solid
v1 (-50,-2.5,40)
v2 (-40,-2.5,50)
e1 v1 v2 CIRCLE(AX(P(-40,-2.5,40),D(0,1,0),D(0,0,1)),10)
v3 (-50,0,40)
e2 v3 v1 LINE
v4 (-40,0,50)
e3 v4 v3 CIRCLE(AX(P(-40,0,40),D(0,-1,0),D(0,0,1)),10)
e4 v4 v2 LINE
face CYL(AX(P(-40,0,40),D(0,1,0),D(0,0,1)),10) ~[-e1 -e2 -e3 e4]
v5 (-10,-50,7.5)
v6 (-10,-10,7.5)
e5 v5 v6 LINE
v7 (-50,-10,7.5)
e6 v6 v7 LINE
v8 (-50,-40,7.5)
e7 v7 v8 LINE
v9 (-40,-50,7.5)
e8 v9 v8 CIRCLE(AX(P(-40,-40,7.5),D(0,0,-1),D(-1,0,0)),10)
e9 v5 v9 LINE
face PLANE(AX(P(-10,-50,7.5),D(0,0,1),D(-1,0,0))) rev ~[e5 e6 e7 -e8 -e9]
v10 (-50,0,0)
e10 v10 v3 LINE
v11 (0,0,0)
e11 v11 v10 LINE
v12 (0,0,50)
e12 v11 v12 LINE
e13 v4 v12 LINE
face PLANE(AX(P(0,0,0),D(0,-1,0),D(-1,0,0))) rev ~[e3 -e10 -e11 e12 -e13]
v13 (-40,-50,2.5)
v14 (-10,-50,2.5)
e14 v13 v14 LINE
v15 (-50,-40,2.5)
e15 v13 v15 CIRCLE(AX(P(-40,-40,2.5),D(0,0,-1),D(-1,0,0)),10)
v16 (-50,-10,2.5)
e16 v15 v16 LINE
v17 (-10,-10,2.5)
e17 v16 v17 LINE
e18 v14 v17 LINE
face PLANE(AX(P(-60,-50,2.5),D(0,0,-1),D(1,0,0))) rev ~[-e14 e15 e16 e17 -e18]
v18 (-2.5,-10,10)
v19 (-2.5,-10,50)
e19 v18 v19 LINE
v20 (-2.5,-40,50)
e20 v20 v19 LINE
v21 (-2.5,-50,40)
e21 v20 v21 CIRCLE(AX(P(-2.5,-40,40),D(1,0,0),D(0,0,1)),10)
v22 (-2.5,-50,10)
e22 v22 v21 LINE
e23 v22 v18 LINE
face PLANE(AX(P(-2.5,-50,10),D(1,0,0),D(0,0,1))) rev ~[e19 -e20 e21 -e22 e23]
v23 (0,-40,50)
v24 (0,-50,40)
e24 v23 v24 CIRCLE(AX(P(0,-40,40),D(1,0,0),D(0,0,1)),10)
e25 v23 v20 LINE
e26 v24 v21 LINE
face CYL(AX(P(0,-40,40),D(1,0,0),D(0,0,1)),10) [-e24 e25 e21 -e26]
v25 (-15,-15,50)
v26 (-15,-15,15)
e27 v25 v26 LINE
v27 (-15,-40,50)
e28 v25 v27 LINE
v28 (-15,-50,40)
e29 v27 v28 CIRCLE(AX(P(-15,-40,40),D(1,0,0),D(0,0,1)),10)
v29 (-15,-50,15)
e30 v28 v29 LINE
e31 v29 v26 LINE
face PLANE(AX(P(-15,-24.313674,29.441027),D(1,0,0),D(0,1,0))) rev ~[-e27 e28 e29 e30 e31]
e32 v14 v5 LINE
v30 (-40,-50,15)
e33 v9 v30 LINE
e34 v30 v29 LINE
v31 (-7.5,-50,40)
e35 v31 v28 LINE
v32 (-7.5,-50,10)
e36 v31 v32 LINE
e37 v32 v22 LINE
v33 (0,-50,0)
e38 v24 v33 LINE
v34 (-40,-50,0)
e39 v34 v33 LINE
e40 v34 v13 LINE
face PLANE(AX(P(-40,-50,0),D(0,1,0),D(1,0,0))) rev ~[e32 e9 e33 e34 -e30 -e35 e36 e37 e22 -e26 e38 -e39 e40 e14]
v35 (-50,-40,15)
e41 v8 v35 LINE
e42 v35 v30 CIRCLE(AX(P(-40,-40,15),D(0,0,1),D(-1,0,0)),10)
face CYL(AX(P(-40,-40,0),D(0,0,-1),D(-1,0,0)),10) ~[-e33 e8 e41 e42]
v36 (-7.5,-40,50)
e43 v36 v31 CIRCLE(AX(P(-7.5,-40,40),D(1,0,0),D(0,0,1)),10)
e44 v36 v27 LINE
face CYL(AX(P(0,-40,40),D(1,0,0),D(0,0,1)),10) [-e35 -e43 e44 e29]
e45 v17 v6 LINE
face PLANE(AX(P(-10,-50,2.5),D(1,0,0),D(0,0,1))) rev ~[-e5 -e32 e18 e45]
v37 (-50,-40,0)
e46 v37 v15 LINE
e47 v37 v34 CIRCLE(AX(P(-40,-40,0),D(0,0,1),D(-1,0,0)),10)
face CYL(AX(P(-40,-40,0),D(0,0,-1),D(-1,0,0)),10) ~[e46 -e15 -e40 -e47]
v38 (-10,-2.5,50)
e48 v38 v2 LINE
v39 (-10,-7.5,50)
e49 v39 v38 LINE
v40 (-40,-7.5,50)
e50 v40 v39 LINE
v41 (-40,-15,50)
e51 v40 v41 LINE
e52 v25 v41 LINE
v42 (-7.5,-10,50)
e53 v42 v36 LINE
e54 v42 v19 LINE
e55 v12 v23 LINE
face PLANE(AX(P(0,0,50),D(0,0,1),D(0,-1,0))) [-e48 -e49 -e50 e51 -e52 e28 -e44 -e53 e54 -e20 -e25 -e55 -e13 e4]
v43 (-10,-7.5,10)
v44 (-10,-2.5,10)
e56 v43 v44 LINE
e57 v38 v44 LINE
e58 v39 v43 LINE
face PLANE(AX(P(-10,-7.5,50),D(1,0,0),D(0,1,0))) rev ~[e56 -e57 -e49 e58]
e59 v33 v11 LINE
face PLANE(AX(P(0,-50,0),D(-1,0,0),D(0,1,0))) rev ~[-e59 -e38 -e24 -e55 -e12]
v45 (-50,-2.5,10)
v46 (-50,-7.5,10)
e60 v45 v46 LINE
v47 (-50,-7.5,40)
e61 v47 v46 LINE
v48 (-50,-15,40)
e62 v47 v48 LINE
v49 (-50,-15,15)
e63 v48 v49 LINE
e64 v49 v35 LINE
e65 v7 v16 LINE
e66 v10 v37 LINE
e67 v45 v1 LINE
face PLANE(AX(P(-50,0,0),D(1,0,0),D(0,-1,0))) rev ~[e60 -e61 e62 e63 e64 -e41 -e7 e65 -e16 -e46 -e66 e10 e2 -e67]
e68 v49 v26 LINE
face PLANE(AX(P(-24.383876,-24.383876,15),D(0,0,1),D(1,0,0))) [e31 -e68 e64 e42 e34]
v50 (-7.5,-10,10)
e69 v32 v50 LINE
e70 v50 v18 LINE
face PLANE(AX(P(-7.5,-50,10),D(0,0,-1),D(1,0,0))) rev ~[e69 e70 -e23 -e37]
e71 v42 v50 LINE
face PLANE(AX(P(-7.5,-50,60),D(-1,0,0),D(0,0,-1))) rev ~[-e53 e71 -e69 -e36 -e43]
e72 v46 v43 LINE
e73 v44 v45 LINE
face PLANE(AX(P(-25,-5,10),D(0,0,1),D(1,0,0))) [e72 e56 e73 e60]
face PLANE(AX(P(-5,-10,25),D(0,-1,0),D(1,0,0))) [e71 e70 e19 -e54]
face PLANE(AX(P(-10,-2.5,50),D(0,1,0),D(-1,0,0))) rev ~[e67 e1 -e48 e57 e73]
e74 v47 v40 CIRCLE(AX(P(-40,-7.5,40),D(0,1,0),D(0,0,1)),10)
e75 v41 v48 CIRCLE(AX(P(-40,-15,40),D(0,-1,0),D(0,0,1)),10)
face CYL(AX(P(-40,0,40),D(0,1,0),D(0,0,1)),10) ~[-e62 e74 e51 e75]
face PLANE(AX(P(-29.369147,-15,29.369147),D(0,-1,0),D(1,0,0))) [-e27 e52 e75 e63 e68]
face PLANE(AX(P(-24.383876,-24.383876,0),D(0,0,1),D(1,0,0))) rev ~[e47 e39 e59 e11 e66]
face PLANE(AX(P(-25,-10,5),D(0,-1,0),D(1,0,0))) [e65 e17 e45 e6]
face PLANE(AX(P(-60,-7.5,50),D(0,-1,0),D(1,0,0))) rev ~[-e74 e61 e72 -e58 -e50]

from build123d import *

# Parameters (mm, degrees)
F1_DEPTH = 15
F3_DEPTH = 15
F5_DEPTH = 15
F6_W     = 20
F6_H     = 5
F6_W_2   = 5
F6_H_2   = 30
F6_H_3   = 20
F7_DEPTH = 40
F8_W     = 30
F8_H     = 5
F8_W_2   = 20
F9_DEPTH = 40


# Not quite as in the source:
# - a feature names something its author has since deleted; it is built from what else it names


with BuildPart() as f1:
    # F0 (on Top) → F1 (new body)
    with BuildSketch(Plane.XY):
        with BuildLine():
            Line((0, -50), (0, 0))
            Line((0, 0), (-50, 0))
            Line((-50, 0), (-50, -40))
            ThreePointArc((-50, -40), (-47.0710678119, -47.0710678119), (-40, -50))
            Line((-40, -50), (0, -50))
        make_face()
    extrude(amount=F1_DEPTH)

    # F2 (on Right) → F3 (join)
    with BuildSketch(Plane.YZ):
        with BuildLine():
            Line((-50, 10), (0, 10))
            Line((0, 10), (0, 50))
            Line((0, 50), (-40, 50))
            ThreePointArc((-40, 50), (-47.0710678119, 47.0710678119), (-50, 40))
            Line((-50, 40), (-50, 10))
        make_face()
    extrude(amount=-F3_DEPTH)

    # F4 (on Front) → F5 (join)
    with BuildSketch(Plane.XZ):
        with BuildLine():
            Line((-50, 10), (-10, 10))
            Line((-10, 10), (-10, 50))
            Line((-10, 50), (-40, 50))
            ThreePointArc((-40, 50), (-47.0710678119, 47.0710678119), (-50, 40))
            Line((-50, 40), (-50, 10))
        make_face()
    extrude(amount=F5_DEPTH)

    # F6 (on face) → F7 (cut)
    with BuildSketch(Plane.XZ.offset(50)):
        Polygon((-15, 2.5), (-10, 2.5), (-10, 7.5), (-40, 7.5), (-40, 2.5), align=None)
        with Locations((-50, 5)):
            Rectangle(F6_W, F6_H)
        with Locations((-5, 25)):
            Rectangle(F6_W_2, F6_H_2)
        with Locations((-5, 50)):
            Rectangle(F6_W_2, F6_H_3)
    extrude(amount=-F7_DEPTH, mode=Mode.SUBTRACT)

    # F8 (on face) → F9 (cut)
    with BuildSketch(Plane.XY.offset(50)):
        with Locations((-25, -5)):
            Rectangle(F8_W, F8_H)
        with Locations((-50, -5)):
            Rectangle(F8_W_2, F8_H)
    extrude(amount=-F9_DEPTH, mode=Mode.SUBTRACT)


solid = f1.part
